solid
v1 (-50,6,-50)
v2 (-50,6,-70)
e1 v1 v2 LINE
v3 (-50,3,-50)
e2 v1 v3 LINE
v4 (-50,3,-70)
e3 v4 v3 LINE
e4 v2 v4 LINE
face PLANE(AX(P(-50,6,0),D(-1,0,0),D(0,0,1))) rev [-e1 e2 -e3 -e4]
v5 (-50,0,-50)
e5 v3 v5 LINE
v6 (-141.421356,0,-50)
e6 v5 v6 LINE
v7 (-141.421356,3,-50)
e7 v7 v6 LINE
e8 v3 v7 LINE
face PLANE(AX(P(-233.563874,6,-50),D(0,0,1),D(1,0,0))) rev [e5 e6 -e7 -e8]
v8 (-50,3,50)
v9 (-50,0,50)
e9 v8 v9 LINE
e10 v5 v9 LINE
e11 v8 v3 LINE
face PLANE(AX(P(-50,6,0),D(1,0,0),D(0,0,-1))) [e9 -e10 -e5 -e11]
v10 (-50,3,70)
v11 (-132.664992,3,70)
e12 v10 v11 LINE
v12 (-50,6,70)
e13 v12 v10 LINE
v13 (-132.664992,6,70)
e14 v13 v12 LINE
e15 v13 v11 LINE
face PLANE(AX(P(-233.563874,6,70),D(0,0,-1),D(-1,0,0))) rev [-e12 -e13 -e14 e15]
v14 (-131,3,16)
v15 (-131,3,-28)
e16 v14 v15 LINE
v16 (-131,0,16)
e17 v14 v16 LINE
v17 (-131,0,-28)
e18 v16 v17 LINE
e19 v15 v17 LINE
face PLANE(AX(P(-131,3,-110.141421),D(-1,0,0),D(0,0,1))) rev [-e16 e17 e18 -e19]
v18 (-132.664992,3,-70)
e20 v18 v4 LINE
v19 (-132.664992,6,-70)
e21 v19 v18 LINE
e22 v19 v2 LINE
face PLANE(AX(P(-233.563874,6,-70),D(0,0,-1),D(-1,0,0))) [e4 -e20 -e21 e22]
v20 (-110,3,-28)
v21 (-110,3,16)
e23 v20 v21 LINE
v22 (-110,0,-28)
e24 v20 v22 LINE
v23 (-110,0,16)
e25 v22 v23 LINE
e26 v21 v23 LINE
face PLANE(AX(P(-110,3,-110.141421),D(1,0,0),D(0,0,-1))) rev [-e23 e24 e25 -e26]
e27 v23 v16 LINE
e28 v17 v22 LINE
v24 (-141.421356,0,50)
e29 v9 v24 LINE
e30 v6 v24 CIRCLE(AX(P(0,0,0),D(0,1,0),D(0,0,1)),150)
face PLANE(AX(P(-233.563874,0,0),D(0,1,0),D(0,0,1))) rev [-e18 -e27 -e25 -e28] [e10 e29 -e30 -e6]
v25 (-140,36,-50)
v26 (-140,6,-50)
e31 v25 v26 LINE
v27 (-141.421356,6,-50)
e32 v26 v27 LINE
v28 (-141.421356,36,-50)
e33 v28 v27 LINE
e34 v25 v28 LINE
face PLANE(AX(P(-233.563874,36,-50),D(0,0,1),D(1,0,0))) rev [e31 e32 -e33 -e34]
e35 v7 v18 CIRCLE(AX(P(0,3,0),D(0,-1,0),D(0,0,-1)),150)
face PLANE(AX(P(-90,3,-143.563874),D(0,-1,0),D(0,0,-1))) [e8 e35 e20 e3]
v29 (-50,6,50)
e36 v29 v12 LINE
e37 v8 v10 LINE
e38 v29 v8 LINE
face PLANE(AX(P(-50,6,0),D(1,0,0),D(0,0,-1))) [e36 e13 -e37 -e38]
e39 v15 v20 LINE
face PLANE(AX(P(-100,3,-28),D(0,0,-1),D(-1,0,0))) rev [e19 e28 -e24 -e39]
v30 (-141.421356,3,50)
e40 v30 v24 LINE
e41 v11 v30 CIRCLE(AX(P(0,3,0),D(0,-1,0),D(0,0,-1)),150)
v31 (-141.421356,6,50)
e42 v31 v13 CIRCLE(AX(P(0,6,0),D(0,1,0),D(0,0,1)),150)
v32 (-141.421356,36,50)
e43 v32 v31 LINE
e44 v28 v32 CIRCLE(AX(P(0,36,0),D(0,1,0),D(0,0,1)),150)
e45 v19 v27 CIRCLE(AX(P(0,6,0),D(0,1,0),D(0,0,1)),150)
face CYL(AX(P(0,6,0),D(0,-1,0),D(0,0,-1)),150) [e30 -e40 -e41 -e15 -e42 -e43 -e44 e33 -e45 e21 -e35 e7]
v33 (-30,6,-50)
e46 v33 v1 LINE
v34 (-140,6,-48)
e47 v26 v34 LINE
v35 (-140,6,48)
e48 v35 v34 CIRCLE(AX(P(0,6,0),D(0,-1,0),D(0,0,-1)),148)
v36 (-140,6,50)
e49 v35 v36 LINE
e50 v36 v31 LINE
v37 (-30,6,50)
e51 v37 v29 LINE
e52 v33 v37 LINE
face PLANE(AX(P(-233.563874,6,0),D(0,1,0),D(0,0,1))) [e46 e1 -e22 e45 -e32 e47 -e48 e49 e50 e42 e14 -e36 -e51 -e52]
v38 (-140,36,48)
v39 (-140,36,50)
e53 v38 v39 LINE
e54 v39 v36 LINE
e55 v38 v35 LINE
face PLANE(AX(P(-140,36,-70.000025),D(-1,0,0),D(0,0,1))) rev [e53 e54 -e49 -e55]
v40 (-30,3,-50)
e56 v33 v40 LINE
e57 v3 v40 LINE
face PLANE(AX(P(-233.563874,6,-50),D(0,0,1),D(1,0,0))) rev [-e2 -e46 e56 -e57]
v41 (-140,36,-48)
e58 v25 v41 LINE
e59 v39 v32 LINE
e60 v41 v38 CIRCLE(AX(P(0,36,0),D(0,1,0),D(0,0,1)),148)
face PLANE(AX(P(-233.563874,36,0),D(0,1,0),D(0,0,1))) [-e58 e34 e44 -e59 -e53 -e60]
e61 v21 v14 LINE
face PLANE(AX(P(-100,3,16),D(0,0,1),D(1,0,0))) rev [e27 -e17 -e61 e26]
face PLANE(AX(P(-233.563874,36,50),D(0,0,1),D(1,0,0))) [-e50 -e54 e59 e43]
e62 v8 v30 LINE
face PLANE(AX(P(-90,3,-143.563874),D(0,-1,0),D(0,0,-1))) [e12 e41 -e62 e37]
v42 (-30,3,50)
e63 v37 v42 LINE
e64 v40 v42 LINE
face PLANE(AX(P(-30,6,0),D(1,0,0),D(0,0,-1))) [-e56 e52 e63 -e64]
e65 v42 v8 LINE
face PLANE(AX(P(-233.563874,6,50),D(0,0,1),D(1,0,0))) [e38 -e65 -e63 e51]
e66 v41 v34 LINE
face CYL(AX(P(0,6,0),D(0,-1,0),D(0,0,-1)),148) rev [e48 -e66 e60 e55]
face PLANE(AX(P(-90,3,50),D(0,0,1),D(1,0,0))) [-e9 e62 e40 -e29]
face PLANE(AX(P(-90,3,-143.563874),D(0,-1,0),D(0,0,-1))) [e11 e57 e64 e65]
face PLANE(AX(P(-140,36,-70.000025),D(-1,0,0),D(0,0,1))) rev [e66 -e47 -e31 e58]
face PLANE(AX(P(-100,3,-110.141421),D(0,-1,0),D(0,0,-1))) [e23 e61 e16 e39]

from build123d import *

# Parameters (mm, degrees)
BOSS_EXTRUDE1_DEPTH = 6
BOSS_EXTRUDE2_DEPTH = 30
SKETCH3_W           = 20
SKETCH3_H           = 100
CUT_EXTRUDE1_DEPTH  = 3
SHELL1_START        = 2
SHELL1_DEPTH        = 32
SHELL1_START_2      = 5
SHELL1_2_OUTLINE_W  = 2
SHELL1_2_OUTLINE_H  = 96
SHELL1_2_DEPTH      = 29
BOSS_EXTRUDE3_DEPTH = 6
CUT_EXTRUDE2_START  = -2
CUT_EXTRUDE2_DEPTH  = 2
SKETCH8_W           = 21
SKETCH8_H           = 44
CUT_EXTRUDE3_DEPTH  = 3
SKETCH9_W           = 90
SKETCH9_H           = 30
CUT_EXTRUDE4_DEPTH  = 196.437969699


# Read off the part's stored shape, not the designer's step: Shell1
with BuildPart() as part:
    # Sketch1 → Boss-Extrude1 (new body)
    with BuildSketch(Plane(origin=(0, 0, 0), x_dir=(1, 0, 0), z_dir=(0, 1, 0))):
        with BuildLine():
            Line((-50, 50), (-141.421356237, 50))
            ThreePointArc((-141.421356237, 50), (-150, 0), (-141.421356237, -50))
            Line((-141.421356237, -50), (-50, -50))
            Line((-50, -50), (-50, 0))
            Line((-50, 0), (-50, 50))
        make_face()
        with BuildLine():
            Line((-50, -50), (-141.421356237, -50))
            ThreePointArc((-141.421356237, -50), (-137.407538074, -60.159525267), (-132.664991614, -70))
            Line((-132.664991614, -70), (-50, -70))
            Line((-50, -70), (-50, -50))
        make_face()
        Polygon((-30, 50), (-50, 50), (-50, 0), (-50, -50), (-30, -50), (-30, 0), align=None)
        with BuildLine():
            Line((-50, 70), (-132.664991614, 70))
            ThreePointArc((-132.664991614, 70), (-137.407538074, 60.159525267), (-141.421356237, 50))
            Line((-141.421356237, 50), (-50, 50))
            Line((-50, 50), (-50, 70))
        make_face()
    extrude(amount=BOSS_EXTRUDE1_DEPTH)

    # Sketch2 → Boss-Extrude2 (add)
    with BuildSketch(Plane(origin=(0, 6, 0), x_dir=(-1, 0, 0), z_dir=(0, 1, 0))):
        with BuildLine():
            Line((50, 50), (50, -50))
            Line((50, -50), (141.421356237, -50))
            ThreePointArc((141.421356237, -50), (150, 0), (141.421356237, 50))
            Line((141.421356237, 50), (50, 50))
        make_face()
    extrude(amount=BOSS_EXTRUDE2_DEPTH)

    # Sketch3 → Cut-Extrude1 (cut)
    with BuildSketch(Plane.XZ):
        with BuildLine():
            Line((-50, -70), (-50, -50))
            Line((-50, -50), (-141.421356237, -50))
            ThreePointArc((-141.421356237, -50), (-137.407538074, -60.159525267), (-132.664991614, -70))
            Line((-132.664991614, -70), (-50, -70))
        make_face()
        with Locations((-40, 0)):
            Rectangle(SKETCH3_W, SKETCH3_H)
        with BuildLine():
            Line((-141.421356237, 50), (-50, 50))
            Line((-50, 50), (-50, 70))
            Line((-50, 70), (-132.664991614, 70))
            ThreePointArc((-132.664991614, 70), (-137.407538074, 60.159525267), (-141.421356237, 50))
        make_face()
    extrude(amount=-CUT_EXTRUDE1_DEPTH, mode=Mode.SUBTRACT)

    # Shell1 outline → Shell1 (cut)
    with BuildSketch(Plane(origin=(0, 0, 0), x_dir=(1, 0, 0), z_dir=(0, 1, 0)).offset(SHELL1_START)):
        with BuildLine():
            Line((-140, -48), (-52, -48))
            Line((-52, -48), (-52, 48))
            Line((-52, 48), (-140, 48))
            ThreePointArc((-140, 48), (-148, 0), (-140, -48))
        make_face()
    extrude(amount=SHELL1_DEPTH, mode=Mode.SUBTRACT)

    # Shell1 2 outline → Shell1 2 (cut)
    with BuildSketch(Plane(origin=(0, 0, 0), x_dir=(1, 0, 0), z_dir=(0, 1, 0)).offset(SHELL1_START_2)):
        with Locations((-51, 0)):
            Rectangle(SHELL1_2_OUTLINE_W, SHELL1_2_OUTLINE_H)
    extrude(amount=SHELL1_2_DEPTH, mode=Mode.SUBTRACT)

    # Sketch6 → Boss-Extrude3 (add)
    with BuildSketch(Plane.XZ):
        with BuildLine():
            Line((-141.421356237, 50), (-50, 50))
            Line((-50, 50), (-50, -50))
            Line((-50, -50), (-141.421356237, -50))
            ThreePointArc((-141.421356237, -50), (-150, 0), (-141.421356237, 50))
        make_face()
    extrude(amount=-BOSS_EXTRUDE3_DEPTH)

    # Sketch7 → Cut-Extrude2 (cut)
    with BuildSketch(Plane(origin=(0, 36, 0), x_dir=(-1, 0, 0), z_dir=(0, 1, 0)).offset(CUT_EXTRUDE2_START)):
        with BuildLine():
            Line((50, -48), (140, -48))
            ThreePointArc((140, -48), (148, 0), (140, 48))
            Line((140, 48), (50, 48))
            Line((50, 48), (50, -48))
        make_face()
    extrude(amount=CUT_EXTRUDE2_DEPTH, mode=Mode.SUBTRACT)

    # Sketch8 → Cut-Extrude3 (cut)
    with BuildSketch(Plane.XZ):
        with Locations((-120.5, -6)):
            Rectangle(SKETCH8_W, SKETCH8_H)
    extrude(amount=-CUT_EXTRUDE3_DEPTH, mode=Mode.SUBTRACT)

    # Sketch9 → Cut-Extrude4 (cut, through all)
    with BuildSketch(Plane.XY.offset(50)):
        with Locations((-95, 21)):
            Rectangle(SKETCH9_W, SKETCH9_H)
    extrude(amount=-CUT_EXTRUDE4_DEPTH, mode=Mode.SUBTRACT)


solid = part.part
